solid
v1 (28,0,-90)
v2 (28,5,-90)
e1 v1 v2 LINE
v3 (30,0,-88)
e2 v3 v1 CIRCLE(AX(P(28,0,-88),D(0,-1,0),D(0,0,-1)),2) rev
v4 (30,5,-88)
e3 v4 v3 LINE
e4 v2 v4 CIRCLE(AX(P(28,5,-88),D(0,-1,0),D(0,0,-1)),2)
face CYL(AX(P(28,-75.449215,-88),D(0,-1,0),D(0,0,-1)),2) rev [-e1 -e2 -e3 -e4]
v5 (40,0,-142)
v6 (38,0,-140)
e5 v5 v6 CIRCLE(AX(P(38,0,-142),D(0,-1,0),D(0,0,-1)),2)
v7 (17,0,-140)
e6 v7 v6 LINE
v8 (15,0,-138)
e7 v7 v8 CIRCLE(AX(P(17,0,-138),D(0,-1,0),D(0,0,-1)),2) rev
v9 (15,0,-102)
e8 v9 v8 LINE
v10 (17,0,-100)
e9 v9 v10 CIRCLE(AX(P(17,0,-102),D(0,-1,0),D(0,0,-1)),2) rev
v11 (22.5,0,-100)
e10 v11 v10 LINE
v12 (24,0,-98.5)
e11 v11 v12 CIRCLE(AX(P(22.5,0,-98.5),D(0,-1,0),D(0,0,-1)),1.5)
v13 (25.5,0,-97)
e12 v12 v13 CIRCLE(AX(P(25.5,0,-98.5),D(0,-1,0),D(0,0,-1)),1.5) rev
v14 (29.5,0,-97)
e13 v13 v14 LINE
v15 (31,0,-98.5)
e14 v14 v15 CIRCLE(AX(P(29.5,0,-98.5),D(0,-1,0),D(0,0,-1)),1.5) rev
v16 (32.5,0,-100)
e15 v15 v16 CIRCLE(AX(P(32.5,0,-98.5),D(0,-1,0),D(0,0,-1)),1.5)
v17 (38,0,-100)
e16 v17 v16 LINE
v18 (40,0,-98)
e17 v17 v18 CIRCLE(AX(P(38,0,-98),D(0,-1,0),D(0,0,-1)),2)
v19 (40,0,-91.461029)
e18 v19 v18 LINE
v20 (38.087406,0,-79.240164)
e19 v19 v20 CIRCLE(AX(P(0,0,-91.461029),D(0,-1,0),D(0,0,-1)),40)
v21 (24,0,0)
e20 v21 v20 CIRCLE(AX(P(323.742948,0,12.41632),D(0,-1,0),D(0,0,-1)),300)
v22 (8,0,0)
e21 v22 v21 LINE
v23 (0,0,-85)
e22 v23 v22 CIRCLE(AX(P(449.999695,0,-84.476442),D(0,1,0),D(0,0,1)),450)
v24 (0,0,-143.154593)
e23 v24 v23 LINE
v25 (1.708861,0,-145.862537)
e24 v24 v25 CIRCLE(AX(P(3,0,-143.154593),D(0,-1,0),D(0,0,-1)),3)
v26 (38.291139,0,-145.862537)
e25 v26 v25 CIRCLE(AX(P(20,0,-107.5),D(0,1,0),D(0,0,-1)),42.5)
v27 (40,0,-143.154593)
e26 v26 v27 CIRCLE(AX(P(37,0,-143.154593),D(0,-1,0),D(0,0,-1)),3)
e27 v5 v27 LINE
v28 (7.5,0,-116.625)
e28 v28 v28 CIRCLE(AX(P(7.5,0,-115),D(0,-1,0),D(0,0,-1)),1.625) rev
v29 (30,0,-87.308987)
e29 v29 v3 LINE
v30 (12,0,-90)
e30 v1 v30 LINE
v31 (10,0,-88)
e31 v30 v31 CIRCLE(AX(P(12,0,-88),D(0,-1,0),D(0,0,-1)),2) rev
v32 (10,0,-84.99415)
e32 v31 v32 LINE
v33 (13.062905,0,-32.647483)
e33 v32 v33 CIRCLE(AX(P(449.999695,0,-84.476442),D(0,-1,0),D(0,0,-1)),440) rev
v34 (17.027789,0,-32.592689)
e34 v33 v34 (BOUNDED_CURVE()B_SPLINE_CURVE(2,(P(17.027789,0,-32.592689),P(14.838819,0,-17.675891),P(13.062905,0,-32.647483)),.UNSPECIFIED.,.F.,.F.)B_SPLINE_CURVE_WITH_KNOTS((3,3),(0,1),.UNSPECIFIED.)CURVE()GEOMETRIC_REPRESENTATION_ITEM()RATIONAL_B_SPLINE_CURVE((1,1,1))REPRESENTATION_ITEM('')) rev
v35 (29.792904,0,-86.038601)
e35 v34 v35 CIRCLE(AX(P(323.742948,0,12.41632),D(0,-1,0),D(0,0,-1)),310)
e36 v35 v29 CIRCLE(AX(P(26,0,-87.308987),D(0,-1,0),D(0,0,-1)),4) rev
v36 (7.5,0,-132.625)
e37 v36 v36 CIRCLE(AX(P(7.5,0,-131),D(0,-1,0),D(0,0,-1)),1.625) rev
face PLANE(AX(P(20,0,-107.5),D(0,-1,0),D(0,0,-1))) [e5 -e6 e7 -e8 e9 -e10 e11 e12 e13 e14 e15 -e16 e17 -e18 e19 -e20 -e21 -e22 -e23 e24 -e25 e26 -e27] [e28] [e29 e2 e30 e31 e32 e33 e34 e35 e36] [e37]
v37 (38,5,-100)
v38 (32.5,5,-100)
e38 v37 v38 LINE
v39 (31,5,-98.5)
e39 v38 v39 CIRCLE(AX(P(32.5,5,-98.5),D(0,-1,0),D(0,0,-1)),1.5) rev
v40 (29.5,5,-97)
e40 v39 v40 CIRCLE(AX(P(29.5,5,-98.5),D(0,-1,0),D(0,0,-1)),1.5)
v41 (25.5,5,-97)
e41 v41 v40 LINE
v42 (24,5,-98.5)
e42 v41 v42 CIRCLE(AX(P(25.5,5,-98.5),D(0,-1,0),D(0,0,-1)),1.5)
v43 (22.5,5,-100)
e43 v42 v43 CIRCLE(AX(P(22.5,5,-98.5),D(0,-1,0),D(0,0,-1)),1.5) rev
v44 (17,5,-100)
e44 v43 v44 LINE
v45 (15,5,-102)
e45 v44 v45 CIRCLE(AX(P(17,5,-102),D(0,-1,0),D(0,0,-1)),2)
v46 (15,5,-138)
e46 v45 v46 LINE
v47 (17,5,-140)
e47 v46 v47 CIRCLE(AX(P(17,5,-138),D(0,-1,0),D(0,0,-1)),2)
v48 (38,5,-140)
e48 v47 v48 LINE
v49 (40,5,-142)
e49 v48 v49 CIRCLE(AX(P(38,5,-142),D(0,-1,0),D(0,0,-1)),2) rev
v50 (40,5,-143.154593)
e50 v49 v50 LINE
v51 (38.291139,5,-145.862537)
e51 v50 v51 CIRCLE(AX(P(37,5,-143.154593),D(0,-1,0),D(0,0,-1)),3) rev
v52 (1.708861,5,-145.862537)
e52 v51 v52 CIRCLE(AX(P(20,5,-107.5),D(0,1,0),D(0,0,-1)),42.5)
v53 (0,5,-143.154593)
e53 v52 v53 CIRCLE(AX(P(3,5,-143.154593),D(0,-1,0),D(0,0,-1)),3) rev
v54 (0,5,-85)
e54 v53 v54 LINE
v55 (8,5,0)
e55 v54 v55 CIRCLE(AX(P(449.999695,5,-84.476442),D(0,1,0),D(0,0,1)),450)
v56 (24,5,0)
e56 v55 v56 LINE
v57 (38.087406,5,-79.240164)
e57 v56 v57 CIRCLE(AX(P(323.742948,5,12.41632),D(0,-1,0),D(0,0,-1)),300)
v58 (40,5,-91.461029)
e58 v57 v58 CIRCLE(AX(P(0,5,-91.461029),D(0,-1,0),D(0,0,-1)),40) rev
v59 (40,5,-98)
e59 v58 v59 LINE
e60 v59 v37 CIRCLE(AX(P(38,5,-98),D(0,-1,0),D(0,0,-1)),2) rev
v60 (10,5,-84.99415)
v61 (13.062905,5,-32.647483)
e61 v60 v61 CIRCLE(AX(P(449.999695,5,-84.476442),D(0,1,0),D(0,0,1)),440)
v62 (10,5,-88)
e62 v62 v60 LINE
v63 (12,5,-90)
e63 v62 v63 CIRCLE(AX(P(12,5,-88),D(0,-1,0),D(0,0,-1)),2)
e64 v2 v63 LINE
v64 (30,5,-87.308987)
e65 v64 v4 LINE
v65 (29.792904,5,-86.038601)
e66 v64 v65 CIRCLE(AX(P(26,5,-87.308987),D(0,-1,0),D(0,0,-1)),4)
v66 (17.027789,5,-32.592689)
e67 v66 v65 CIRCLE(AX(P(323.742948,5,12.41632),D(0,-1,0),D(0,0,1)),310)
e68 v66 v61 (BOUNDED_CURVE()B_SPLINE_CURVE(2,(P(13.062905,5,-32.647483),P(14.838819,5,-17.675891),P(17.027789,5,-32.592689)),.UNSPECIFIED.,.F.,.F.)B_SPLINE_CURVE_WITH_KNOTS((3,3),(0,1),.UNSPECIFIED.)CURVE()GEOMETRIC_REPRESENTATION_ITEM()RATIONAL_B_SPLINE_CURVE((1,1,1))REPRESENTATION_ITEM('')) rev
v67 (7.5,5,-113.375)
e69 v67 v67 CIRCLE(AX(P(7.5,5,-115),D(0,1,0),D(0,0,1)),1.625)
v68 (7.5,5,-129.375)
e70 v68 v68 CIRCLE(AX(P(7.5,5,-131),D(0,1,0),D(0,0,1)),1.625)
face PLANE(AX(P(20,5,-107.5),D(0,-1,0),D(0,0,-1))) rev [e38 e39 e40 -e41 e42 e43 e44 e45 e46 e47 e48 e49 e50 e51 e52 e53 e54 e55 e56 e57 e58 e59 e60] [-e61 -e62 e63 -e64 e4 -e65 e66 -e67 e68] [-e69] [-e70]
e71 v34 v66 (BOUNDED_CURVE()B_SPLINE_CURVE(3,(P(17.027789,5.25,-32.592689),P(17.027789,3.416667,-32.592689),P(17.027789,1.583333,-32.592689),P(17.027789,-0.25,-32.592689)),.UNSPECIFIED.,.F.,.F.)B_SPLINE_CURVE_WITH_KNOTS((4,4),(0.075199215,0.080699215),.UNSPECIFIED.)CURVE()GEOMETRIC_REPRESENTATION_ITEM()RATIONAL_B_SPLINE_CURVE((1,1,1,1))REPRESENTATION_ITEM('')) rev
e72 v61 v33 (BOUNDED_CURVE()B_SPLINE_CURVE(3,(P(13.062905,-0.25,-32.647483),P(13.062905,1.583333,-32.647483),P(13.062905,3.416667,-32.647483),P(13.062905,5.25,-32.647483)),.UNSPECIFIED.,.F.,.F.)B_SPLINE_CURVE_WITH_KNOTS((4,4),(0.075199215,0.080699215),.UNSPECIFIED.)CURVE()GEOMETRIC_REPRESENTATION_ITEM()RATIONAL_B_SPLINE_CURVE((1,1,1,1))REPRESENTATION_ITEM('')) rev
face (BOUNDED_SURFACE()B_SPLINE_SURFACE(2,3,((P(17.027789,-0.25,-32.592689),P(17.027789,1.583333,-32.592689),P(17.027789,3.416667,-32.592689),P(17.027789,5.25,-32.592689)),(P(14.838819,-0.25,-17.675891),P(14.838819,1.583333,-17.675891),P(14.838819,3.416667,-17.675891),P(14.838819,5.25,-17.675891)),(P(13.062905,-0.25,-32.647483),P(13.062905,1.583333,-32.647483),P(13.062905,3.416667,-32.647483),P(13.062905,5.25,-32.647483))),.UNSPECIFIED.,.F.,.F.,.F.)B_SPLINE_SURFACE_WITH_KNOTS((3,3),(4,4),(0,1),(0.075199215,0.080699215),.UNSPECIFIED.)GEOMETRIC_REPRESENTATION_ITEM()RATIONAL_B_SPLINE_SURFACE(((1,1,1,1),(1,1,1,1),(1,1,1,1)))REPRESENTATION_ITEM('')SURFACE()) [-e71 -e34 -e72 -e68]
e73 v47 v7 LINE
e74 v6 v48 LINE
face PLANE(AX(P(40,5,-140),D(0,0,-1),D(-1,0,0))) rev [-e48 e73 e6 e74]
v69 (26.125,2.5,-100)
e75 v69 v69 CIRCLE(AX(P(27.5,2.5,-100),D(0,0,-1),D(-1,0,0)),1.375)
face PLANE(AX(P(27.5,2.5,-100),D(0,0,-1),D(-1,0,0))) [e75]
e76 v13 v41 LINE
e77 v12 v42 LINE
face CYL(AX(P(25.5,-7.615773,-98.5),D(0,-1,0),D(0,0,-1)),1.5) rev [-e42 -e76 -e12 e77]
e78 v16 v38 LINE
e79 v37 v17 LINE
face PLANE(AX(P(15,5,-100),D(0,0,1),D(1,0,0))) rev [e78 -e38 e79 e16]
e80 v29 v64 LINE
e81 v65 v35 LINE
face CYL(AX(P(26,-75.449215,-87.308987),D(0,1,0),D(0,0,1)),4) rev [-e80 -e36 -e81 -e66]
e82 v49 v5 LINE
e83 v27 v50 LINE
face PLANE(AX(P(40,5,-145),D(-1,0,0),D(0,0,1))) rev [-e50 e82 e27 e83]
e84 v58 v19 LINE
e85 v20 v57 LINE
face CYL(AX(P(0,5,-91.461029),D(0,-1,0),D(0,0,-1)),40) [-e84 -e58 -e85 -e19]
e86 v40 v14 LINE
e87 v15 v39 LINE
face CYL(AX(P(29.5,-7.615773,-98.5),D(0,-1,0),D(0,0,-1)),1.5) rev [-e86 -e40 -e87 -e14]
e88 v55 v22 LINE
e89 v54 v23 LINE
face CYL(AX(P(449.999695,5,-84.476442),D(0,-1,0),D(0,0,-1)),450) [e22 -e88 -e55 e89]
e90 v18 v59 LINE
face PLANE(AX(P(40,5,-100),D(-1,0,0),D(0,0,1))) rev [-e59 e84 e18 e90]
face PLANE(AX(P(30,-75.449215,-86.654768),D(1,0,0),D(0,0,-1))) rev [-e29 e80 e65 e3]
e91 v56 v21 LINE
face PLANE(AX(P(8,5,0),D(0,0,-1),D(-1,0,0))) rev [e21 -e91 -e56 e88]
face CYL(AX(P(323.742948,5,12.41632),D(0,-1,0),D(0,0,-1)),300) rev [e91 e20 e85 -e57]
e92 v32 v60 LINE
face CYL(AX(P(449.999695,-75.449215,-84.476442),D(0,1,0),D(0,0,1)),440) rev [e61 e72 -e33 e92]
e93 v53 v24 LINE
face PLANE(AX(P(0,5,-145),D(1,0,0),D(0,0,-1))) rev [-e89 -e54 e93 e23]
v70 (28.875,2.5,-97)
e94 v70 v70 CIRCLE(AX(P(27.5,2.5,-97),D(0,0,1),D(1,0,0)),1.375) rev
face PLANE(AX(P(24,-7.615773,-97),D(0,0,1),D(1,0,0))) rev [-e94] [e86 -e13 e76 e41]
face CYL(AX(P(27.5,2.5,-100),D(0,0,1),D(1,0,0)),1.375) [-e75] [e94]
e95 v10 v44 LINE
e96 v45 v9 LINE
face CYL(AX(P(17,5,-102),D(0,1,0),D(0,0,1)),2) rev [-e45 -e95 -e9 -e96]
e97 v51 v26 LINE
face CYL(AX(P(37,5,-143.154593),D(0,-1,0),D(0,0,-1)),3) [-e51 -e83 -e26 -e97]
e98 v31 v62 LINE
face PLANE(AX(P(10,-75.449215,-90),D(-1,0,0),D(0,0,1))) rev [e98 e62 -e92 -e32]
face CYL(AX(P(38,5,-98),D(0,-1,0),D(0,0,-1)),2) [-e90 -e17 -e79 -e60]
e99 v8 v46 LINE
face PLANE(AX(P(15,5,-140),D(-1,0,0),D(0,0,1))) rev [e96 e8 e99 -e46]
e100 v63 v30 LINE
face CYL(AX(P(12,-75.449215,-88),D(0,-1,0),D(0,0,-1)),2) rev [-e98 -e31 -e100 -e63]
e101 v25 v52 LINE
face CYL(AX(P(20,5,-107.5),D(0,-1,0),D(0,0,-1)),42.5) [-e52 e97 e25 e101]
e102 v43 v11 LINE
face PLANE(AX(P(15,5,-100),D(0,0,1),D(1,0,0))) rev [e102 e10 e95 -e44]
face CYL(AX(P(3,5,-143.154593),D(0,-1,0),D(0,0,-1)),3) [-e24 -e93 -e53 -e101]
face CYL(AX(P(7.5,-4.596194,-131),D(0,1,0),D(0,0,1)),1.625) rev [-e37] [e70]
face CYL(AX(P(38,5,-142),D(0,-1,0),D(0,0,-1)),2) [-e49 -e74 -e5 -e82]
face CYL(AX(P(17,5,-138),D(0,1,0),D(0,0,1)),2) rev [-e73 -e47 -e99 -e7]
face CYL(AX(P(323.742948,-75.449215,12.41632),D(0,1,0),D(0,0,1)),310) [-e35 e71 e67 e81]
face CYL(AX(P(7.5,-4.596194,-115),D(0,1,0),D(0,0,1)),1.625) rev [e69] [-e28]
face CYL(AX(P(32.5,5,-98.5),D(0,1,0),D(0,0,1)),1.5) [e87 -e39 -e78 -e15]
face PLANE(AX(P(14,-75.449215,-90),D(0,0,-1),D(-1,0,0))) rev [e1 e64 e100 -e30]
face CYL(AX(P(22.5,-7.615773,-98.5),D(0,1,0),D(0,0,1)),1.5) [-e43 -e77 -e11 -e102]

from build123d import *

# Parameters (mm, degrees)
BOSS_EXTRUDE1_DEPTH = 5
SKETCH2_R           = 1.625
CUT_EXTRUDE1_DEPTH  = 5
SKETCH3_W           = 7
SKETCH3_H           = 3
CUT_EXTRUDE2_DEPTH  = 5
SKETCH4_R           = 1.375
BOSS_EXTRUDE2_DEPTH = 3
CUT_EXTRUDE3_DEPTH  = 5
FILLET1_R           = 2
FILLET2_R           = 4
FILLET3_R           = 40
FILLET5_R           = 2
FILLET6_R           = 2
FILLET7_R           = 3
FILLET10_R          = 1.5


# Some blends are built 0.0001 mm under size
with BuildPart() as part:
    # Sketch1 → Boss-Extrude1 (new body)
    with BuildSketch(Plane(origin=(0, 0, 0), x_dir=(1, 0, 0), z_dir=(0, 1, 0))):
        with BuildLine():
            Line((0, 145), (0, 85))
            ThreePointArc((0, 85), (1.979630786, 42.309847603), (8, 0))
            Line((8, 0), (24, 0))
            ThreePointArc((24, 0), (28.920632518, 43.079645644), (40, 85))
            Line((40, 85), (40, 100))
            Line((40, 100), (15, 100))
            Line((15, 100), (15, 140))
            Line((15, 140), (40, 140))
            Line((40, 140), (40, 145))
            ThreePointArc((40, 145), (20, 150), (0, 145))
        make_face()
    extrude(amount=BOSS_EXTRUDE1_DEPTH)

    # Sketch2 → Cut-Extrude1 (cut)
    with BuildSketch(Plane(origin=(0, 5, 0), x_dir=(1, 0, 0), z_dir=(0, 1, 0))):
        with Locations(Location((7.5, 131, 0), (0, 0, 270))):
            Circle(SKETCH2_R)
        with Locations(Location((7.5, 115, 0), (0, 0, 270))):
            Circle(SKETCH2_R)
    extrude(amount=-CUT_EXTRUDE1_DEPTH, mode=Mode.SUBTRACT)

    # Sketch3 → Cut-Extrude2 (cut)
    with BuildSketch(Plane(origin=(0, 5, 0), x_dir=(1, 0, 0), z_dir=(0, 1, 0))):
        with Locations((27.5, 98.5)):
            Rectangle(SKETCH3_W, SKETCH3_H)
    extrude(amount=-CUT_EXTRUDE2_DEPTH, mode=Mode.SUBTRACT)

    # Sketch4 → Boss-Extrude2 (add)
    with BuildSketch(Plane(origin=(0, 0, -97), x_dir=(-1, 0, 0), z_dir=(0, 0, -1))):
        with Locations(Location((-27.5, 2.5, 0), (0, 0, 180))):
            Circle(SKETCH4_R)
    extrude(amount=BOSS_EXTRUDE2_DEPTH)

    # Sketch5 → Cut-Extrude3 (cut)
    with BuildSketch(Plane(origin=(0, 5, 0), x_dir=(1, 0, 0), z_dir=(0, 1, 0))):
        with BuildLine():
            Line((14, 90), (30, 90))
            Line((30, 90), (30, 87))
            Line((30, 87), (30, 86.654767806))
            ThreePointArc((30, 86.654767806), (20.590082312, 52.378278053), (15.165707783, 17.249935341))
            ThreePointArc((15.165707783, 17.249935341), (11.273342316, 51.022188328), (10, 84.994150003))
            Line((10, 84.994150003), (10, 90))
            Line((10, 90), (14, 90))
        make_face()
    extrude(amount=-CUT_EXTRUDE3_DEPTH, mode=Mode.SUBTRACT)

    # Fillet1
    fillet1_edges = [part.edges().sort_by_distance(p)[0] for p in [
        (10, 2.5, -90),
        (30, 2.5, -90),
    ]]
    fillet(fillet1_edges, radius=FILLET1_R)

    # Fillet2
    fillet2_edges = [part.edges().sort_by_distance(p)[0] for p in [
        (30, 2.5, -86.654767806),
    ]]
    fillet(fillet2_edges, radius=FILLET2_R)

    # Fillet3
    fillet3_edges = [part.edges().sort_by_distance(p)[0] for p in [
        (40, 2.5, -85),
    ]]
    fillet(fillet3_edges, radius=FILLET3_R)

    # Fillet5
    fillet5_edges = [part.edges().sort_by_distance(p)[0] for p in [
        (15, 2.5, -140),
        (15, 2.5, -100),
    ]]
    fillet(fillet5_edges, radius=FILLET5_R)

    # Fillet6
    fillet6_edges = [part.edges().sort_by_distance(p)[0] for p in [
        (40, 2.5, -140),
        (40, 2.5, -100),
    ]]
    fillet(fillet6_edges, radius=FILLET6_R)

    # Fillet7
    fillet7_edges = [part.edges().sort_by_distance(p)[0] for p in [
        (40, 2.5, -145),
        (0, 2.5, -145),
    ]]
    fillet(fillet7_edges, radius=FILLET7_R)

    # Fillet8
    # a fillet whose section is not a circle: 2 mm, written as the material it adds along each edge
    with BuildSketch(Plane(origin=(15.165707783, 5, -17.249935341), x_dir=(0.12048141281398392, 0, -0.9927155832192553), z_dir=(0, -1, 0))) as fillet8_piece_1:
        with BuildLine():
            Bezier((15.455336501, 0), (0.383468278, -0.375827748), (15.032037076, -3.942603658), weights=[1, 1, 1])
            ThreePointArc((15.032037076, -3.942603658), (7.498610953, -2.037672046), (0, 0))
            ThreePointArc((0, 0), (7.72766825, -0.096332478), (15.455336501, 0))
        make_face()
    extrude(amount=5)

    # Fillet10
    fillet10_edges = [part.edges().sort_by_distance(p)[0] for p in [
        (31, 2.5, -97),
        (24, 2.5, -97),
    ]]
    fillet(fillet10_edges, radius=FILLET10_R)
    fillet10_2_edges = [part.edges().sort_by_distance(p)[0] for p in [
        (31, 2.5, -100),
        (24, 2.5, -100),
    ]]
    fillet(fillet10_2_edges, radius=FILLET10_R - 0.0001)  # a hair under: the kernel refuses the full size


solid = part.part
